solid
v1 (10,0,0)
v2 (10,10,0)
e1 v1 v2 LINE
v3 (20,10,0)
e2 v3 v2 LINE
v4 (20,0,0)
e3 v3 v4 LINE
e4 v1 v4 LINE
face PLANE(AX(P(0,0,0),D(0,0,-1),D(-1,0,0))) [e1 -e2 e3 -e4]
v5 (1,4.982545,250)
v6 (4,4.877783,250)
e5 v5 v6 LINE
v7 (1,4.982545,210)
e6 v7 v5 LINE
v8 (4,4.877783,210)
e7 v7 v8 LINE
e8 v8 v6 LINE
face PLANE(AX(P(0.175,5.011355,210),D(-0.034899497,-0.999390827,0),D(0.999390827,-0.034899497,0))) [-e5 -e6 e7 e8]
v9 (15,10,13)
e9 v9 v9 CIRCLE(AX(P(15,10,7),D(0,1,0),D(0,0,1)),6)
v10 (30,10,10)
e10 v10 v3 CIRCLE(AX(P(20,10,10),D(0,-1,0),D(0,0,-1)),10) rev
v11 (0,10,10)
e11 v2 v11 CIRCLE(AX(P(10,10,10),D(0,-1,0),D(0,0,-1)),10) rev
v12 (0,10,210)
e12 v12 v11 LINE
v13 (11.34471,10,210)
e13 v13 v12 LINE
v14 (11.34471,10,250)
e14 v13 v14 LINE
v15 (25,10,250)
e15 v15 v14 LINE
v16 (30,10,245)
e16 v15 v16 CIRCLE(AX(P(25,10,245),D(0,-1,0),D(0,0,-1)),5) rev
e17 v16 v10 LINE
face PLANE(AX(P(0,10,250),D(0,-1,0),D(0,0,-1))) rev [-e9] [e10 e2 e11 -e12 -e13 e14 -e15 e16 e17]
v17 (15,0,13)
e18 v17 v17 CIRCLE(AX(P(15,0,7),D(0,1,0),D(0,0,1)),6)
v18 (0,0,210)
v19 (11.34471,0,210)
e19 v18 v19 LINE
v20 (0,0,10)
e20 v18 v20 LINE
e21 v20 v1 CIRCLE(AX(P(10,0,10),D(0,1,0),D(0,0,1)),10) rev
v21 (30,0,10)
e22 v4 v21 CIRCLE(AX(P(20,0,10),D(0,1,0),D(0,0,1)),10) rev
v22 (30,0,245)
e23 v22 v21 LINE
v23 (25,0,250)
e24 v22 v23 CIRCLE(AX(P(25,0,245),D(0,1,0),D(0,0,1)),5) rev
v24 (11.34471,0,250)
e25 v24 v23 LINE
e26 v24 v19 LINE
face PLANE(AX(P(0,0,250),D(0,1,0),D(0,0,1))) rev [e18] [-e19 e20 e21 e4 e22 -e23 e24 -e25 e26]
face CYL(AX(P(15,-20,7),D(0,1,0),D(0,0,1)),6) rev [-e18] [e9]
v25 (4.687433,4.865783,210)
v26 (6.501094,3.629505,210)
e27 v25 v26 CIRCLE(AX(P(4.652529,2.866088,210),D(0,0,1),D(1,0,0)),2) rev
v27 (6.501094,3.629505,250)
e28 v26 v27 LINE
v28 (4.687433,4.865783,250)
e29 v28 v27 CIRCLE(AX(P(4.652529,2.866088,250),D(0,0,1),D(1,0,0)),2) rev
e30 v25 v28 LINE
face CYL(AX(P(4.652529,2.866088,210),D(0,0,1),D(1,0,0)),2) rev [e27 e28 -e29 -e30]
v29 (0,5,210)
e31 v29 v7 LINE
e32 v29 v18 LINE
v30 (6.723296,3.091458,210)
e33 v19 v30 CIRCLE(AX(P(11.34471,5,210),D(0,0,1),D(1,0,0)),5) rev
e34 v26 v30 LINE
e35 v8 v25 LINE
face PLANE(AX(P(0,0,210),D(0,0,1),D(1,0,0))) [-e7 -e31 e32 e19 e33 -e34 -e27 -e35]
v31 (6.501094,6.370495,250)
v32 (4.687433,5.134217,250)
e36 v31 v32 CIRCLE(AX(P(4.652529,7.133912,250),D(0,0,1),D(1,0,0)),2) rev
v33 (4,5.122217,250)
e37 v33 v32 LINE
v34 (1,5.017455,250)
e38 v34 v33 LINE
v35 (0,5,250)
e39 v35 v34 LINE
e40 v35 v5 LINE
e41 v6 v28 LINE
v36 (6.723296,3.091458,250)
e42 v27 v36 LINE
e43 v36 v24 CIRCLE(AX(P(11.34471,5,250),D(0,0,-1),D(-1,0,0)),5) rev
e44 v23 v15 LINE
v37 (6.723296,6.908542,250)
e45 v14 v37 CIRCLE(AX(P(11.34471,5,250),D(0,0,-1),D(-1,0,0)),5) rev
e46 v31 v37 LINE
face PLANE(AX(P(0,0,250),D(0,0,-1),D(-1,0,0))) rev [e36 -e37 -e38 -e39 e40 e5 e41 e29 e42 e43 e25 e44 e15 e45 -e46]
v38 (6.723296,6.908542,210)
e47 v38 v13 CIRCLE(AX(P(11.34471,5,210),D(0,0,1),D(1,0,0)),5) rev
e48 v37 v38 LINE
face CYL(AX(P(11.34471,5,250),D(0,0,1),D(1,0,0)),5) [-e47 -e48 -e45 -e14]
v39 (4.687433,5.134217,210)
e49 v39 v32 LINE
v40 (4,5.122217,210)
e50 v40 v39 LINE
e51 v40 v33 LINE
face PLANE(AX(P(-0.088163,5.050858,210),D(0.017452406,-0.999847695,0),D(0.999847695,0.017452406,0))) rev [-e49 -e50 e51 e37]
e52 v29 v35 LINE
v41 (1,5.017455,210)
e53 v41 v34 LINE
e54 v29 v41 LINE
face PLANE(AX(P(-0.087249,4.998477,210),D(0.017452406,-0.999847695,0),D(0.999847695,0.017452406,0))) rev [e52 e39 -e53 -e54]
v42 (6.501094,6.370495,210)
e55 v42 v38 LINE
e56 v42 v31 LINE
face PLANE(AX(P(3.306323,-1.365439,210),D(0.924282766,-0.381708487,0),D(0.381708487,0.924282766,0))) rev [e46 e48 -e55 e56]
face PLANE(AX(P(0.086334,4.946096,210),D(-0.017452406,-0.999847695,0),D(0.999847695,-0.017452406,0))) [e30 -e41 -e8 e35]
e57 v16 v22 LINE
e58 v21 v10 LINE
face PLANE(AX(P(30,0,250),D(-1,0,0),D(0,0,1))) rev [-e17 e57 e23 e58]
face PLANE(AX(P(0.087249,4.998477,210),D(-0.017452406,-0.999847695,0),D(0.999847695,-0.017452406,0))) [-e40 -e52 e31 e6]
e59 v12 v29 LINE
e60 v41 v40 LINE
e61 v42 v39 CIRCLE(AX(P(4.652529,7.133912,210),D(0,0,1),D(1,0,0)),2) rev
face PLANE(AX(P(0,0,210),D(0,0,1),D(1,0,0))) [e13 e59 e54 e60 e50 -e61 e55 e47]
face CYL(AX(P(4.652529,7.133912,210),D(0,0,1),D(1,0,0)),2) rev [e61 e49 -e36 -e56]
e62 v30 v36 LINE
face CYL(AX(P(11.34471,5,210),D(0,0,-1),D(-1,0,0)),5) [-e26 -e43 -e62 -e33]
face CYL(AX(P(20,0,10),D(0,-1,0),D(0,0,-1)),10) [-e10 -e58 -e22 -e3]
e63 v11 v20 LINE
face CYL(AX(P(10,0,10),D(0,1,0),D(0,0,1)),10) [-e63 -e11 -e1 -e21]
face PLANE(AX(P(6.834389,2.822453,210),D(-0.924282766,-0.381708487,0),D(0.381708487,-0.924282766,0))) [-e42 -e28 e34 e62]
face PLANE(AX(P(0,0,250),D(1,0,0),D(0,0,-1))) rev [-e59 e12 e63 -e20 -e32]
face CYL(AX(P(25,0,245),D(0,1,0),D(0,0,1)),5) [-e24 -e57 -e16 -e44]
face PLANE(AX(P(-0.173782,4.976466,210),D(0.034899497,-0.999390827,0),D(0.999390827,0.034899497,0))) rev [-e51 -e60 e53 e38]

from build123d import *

# Parameters (mm, degrees)
SKETCH2_W           = 30
SKETCH2_H           = 10
BOSS_EXTRUDE1_DEPTH = 250
SKETCH3_R           = 6
CUT_EXTRUDE1_DEPTH  = 30
FILLET1_R           = 10
FILLET3_R           = 10
CUT_EXTRUDE2_DEPTH  = 40
FILLET4_R           = 5
FILLET5_R           = 5
FILLET6_R           = 5


with BuildPart() as part:
    # Sketch2 → Boss-Extrude1 (new body)
    with BuildSketch(Plane.XY):
        with Locations((15, 5)):
            Rectangle(SKETCH2_W, SKETCH2_H)
    extrude(amount=BOSS_EXTRUDE1_DEPTH)

    # Sketch3 → Cut-Extrude1 (cut)
    with BuildSketch(Plane(origin=(0, 10, 0), x_dir=(1, 0, 0), z_dir=(0, 1, 0))):
        with Locations((15, -7)):
            Circle(SKETCH3_R)
    extrude(amount=-CUT_EXTRUDE1_DEPTH, mode=Mode.SUBTRACT)

    # Fillet1
    fillet1_edges = [part.edges().sort_by_distance(p)[0] for p in [
        (30, 5, 0),
    ]]
    fillet(fillet1_edges, radius=FILLET1_R)

    # Fillet3
    fillet3_edges = [part.edges().sort_by_distance(p)[0] for p in [
        (0, 5, 0),
    ]]
    fillet(fillet3_edges, radius=FILLET3_R)

    # Sketch5 → Cut-Extrude2 (cut)
    with BuildSketch(Plane.XY.offset(250)):
        with BuildLine():
            Line((0, 10), (0, 5))
            Line((0, 5), (1, 5.017455065))
            Line((1, 5.017455065), (4, 5.122217373))
            Line((4, 5.122217373), (4.687433408, 5.134216568))
            ThreePointArc((4.687433408, 5.134216568), (5.779010382, 5.481326474), (6.501094127, 6.370494985))
            Line((6.501094127, 6.370494985), (8, 10))
            Line((8, 10), (0, 10))
        make_face()
        with BuildLine():
            Line((1, 4.982544935), (0, 5))
            Line((0, 5), (0, 0))
            Line((0, 0), (8, 0))
            Line((8, 0), (6.501094127, 3.629505015))
            ThreePointArc((6.501094127, 3.629505015), (5.779010382, 4.518673526), (4.687433408, 4.865783432))
            Line((4.687433408, 4.865783432), (4, 4.877782627))
            Line((4, 4.877782627), (1, 4.982544935))
        make_face()
    extrude(amount=-CUT_EXTRUDE2_DEPTH, mode=Mode.SUBTRACT)

    # Fillet4
    fillet4_edges = [part.edges().sort_by_distance(p)[0] for p in [
        (8, 10, 230),
    ]]
    fillet(fillet4_edges, radius=FILLET4_R)

    # Fillet5
    fillet5_edges = [part.edges().sort_by_distance(p)[0] for p in [
        (8, 0, 230),
    ]]
    fillet(fillet5_edges, radius=FILLET5_R)

    # Fillet6
    fillet6_edges = [part.edges().sort_by_distance(p)[0] for p in [
        (30, 5, 250),
    ]]
    fillet(fillet6_edges, radius=FILLET6_R)


solid = part.part
